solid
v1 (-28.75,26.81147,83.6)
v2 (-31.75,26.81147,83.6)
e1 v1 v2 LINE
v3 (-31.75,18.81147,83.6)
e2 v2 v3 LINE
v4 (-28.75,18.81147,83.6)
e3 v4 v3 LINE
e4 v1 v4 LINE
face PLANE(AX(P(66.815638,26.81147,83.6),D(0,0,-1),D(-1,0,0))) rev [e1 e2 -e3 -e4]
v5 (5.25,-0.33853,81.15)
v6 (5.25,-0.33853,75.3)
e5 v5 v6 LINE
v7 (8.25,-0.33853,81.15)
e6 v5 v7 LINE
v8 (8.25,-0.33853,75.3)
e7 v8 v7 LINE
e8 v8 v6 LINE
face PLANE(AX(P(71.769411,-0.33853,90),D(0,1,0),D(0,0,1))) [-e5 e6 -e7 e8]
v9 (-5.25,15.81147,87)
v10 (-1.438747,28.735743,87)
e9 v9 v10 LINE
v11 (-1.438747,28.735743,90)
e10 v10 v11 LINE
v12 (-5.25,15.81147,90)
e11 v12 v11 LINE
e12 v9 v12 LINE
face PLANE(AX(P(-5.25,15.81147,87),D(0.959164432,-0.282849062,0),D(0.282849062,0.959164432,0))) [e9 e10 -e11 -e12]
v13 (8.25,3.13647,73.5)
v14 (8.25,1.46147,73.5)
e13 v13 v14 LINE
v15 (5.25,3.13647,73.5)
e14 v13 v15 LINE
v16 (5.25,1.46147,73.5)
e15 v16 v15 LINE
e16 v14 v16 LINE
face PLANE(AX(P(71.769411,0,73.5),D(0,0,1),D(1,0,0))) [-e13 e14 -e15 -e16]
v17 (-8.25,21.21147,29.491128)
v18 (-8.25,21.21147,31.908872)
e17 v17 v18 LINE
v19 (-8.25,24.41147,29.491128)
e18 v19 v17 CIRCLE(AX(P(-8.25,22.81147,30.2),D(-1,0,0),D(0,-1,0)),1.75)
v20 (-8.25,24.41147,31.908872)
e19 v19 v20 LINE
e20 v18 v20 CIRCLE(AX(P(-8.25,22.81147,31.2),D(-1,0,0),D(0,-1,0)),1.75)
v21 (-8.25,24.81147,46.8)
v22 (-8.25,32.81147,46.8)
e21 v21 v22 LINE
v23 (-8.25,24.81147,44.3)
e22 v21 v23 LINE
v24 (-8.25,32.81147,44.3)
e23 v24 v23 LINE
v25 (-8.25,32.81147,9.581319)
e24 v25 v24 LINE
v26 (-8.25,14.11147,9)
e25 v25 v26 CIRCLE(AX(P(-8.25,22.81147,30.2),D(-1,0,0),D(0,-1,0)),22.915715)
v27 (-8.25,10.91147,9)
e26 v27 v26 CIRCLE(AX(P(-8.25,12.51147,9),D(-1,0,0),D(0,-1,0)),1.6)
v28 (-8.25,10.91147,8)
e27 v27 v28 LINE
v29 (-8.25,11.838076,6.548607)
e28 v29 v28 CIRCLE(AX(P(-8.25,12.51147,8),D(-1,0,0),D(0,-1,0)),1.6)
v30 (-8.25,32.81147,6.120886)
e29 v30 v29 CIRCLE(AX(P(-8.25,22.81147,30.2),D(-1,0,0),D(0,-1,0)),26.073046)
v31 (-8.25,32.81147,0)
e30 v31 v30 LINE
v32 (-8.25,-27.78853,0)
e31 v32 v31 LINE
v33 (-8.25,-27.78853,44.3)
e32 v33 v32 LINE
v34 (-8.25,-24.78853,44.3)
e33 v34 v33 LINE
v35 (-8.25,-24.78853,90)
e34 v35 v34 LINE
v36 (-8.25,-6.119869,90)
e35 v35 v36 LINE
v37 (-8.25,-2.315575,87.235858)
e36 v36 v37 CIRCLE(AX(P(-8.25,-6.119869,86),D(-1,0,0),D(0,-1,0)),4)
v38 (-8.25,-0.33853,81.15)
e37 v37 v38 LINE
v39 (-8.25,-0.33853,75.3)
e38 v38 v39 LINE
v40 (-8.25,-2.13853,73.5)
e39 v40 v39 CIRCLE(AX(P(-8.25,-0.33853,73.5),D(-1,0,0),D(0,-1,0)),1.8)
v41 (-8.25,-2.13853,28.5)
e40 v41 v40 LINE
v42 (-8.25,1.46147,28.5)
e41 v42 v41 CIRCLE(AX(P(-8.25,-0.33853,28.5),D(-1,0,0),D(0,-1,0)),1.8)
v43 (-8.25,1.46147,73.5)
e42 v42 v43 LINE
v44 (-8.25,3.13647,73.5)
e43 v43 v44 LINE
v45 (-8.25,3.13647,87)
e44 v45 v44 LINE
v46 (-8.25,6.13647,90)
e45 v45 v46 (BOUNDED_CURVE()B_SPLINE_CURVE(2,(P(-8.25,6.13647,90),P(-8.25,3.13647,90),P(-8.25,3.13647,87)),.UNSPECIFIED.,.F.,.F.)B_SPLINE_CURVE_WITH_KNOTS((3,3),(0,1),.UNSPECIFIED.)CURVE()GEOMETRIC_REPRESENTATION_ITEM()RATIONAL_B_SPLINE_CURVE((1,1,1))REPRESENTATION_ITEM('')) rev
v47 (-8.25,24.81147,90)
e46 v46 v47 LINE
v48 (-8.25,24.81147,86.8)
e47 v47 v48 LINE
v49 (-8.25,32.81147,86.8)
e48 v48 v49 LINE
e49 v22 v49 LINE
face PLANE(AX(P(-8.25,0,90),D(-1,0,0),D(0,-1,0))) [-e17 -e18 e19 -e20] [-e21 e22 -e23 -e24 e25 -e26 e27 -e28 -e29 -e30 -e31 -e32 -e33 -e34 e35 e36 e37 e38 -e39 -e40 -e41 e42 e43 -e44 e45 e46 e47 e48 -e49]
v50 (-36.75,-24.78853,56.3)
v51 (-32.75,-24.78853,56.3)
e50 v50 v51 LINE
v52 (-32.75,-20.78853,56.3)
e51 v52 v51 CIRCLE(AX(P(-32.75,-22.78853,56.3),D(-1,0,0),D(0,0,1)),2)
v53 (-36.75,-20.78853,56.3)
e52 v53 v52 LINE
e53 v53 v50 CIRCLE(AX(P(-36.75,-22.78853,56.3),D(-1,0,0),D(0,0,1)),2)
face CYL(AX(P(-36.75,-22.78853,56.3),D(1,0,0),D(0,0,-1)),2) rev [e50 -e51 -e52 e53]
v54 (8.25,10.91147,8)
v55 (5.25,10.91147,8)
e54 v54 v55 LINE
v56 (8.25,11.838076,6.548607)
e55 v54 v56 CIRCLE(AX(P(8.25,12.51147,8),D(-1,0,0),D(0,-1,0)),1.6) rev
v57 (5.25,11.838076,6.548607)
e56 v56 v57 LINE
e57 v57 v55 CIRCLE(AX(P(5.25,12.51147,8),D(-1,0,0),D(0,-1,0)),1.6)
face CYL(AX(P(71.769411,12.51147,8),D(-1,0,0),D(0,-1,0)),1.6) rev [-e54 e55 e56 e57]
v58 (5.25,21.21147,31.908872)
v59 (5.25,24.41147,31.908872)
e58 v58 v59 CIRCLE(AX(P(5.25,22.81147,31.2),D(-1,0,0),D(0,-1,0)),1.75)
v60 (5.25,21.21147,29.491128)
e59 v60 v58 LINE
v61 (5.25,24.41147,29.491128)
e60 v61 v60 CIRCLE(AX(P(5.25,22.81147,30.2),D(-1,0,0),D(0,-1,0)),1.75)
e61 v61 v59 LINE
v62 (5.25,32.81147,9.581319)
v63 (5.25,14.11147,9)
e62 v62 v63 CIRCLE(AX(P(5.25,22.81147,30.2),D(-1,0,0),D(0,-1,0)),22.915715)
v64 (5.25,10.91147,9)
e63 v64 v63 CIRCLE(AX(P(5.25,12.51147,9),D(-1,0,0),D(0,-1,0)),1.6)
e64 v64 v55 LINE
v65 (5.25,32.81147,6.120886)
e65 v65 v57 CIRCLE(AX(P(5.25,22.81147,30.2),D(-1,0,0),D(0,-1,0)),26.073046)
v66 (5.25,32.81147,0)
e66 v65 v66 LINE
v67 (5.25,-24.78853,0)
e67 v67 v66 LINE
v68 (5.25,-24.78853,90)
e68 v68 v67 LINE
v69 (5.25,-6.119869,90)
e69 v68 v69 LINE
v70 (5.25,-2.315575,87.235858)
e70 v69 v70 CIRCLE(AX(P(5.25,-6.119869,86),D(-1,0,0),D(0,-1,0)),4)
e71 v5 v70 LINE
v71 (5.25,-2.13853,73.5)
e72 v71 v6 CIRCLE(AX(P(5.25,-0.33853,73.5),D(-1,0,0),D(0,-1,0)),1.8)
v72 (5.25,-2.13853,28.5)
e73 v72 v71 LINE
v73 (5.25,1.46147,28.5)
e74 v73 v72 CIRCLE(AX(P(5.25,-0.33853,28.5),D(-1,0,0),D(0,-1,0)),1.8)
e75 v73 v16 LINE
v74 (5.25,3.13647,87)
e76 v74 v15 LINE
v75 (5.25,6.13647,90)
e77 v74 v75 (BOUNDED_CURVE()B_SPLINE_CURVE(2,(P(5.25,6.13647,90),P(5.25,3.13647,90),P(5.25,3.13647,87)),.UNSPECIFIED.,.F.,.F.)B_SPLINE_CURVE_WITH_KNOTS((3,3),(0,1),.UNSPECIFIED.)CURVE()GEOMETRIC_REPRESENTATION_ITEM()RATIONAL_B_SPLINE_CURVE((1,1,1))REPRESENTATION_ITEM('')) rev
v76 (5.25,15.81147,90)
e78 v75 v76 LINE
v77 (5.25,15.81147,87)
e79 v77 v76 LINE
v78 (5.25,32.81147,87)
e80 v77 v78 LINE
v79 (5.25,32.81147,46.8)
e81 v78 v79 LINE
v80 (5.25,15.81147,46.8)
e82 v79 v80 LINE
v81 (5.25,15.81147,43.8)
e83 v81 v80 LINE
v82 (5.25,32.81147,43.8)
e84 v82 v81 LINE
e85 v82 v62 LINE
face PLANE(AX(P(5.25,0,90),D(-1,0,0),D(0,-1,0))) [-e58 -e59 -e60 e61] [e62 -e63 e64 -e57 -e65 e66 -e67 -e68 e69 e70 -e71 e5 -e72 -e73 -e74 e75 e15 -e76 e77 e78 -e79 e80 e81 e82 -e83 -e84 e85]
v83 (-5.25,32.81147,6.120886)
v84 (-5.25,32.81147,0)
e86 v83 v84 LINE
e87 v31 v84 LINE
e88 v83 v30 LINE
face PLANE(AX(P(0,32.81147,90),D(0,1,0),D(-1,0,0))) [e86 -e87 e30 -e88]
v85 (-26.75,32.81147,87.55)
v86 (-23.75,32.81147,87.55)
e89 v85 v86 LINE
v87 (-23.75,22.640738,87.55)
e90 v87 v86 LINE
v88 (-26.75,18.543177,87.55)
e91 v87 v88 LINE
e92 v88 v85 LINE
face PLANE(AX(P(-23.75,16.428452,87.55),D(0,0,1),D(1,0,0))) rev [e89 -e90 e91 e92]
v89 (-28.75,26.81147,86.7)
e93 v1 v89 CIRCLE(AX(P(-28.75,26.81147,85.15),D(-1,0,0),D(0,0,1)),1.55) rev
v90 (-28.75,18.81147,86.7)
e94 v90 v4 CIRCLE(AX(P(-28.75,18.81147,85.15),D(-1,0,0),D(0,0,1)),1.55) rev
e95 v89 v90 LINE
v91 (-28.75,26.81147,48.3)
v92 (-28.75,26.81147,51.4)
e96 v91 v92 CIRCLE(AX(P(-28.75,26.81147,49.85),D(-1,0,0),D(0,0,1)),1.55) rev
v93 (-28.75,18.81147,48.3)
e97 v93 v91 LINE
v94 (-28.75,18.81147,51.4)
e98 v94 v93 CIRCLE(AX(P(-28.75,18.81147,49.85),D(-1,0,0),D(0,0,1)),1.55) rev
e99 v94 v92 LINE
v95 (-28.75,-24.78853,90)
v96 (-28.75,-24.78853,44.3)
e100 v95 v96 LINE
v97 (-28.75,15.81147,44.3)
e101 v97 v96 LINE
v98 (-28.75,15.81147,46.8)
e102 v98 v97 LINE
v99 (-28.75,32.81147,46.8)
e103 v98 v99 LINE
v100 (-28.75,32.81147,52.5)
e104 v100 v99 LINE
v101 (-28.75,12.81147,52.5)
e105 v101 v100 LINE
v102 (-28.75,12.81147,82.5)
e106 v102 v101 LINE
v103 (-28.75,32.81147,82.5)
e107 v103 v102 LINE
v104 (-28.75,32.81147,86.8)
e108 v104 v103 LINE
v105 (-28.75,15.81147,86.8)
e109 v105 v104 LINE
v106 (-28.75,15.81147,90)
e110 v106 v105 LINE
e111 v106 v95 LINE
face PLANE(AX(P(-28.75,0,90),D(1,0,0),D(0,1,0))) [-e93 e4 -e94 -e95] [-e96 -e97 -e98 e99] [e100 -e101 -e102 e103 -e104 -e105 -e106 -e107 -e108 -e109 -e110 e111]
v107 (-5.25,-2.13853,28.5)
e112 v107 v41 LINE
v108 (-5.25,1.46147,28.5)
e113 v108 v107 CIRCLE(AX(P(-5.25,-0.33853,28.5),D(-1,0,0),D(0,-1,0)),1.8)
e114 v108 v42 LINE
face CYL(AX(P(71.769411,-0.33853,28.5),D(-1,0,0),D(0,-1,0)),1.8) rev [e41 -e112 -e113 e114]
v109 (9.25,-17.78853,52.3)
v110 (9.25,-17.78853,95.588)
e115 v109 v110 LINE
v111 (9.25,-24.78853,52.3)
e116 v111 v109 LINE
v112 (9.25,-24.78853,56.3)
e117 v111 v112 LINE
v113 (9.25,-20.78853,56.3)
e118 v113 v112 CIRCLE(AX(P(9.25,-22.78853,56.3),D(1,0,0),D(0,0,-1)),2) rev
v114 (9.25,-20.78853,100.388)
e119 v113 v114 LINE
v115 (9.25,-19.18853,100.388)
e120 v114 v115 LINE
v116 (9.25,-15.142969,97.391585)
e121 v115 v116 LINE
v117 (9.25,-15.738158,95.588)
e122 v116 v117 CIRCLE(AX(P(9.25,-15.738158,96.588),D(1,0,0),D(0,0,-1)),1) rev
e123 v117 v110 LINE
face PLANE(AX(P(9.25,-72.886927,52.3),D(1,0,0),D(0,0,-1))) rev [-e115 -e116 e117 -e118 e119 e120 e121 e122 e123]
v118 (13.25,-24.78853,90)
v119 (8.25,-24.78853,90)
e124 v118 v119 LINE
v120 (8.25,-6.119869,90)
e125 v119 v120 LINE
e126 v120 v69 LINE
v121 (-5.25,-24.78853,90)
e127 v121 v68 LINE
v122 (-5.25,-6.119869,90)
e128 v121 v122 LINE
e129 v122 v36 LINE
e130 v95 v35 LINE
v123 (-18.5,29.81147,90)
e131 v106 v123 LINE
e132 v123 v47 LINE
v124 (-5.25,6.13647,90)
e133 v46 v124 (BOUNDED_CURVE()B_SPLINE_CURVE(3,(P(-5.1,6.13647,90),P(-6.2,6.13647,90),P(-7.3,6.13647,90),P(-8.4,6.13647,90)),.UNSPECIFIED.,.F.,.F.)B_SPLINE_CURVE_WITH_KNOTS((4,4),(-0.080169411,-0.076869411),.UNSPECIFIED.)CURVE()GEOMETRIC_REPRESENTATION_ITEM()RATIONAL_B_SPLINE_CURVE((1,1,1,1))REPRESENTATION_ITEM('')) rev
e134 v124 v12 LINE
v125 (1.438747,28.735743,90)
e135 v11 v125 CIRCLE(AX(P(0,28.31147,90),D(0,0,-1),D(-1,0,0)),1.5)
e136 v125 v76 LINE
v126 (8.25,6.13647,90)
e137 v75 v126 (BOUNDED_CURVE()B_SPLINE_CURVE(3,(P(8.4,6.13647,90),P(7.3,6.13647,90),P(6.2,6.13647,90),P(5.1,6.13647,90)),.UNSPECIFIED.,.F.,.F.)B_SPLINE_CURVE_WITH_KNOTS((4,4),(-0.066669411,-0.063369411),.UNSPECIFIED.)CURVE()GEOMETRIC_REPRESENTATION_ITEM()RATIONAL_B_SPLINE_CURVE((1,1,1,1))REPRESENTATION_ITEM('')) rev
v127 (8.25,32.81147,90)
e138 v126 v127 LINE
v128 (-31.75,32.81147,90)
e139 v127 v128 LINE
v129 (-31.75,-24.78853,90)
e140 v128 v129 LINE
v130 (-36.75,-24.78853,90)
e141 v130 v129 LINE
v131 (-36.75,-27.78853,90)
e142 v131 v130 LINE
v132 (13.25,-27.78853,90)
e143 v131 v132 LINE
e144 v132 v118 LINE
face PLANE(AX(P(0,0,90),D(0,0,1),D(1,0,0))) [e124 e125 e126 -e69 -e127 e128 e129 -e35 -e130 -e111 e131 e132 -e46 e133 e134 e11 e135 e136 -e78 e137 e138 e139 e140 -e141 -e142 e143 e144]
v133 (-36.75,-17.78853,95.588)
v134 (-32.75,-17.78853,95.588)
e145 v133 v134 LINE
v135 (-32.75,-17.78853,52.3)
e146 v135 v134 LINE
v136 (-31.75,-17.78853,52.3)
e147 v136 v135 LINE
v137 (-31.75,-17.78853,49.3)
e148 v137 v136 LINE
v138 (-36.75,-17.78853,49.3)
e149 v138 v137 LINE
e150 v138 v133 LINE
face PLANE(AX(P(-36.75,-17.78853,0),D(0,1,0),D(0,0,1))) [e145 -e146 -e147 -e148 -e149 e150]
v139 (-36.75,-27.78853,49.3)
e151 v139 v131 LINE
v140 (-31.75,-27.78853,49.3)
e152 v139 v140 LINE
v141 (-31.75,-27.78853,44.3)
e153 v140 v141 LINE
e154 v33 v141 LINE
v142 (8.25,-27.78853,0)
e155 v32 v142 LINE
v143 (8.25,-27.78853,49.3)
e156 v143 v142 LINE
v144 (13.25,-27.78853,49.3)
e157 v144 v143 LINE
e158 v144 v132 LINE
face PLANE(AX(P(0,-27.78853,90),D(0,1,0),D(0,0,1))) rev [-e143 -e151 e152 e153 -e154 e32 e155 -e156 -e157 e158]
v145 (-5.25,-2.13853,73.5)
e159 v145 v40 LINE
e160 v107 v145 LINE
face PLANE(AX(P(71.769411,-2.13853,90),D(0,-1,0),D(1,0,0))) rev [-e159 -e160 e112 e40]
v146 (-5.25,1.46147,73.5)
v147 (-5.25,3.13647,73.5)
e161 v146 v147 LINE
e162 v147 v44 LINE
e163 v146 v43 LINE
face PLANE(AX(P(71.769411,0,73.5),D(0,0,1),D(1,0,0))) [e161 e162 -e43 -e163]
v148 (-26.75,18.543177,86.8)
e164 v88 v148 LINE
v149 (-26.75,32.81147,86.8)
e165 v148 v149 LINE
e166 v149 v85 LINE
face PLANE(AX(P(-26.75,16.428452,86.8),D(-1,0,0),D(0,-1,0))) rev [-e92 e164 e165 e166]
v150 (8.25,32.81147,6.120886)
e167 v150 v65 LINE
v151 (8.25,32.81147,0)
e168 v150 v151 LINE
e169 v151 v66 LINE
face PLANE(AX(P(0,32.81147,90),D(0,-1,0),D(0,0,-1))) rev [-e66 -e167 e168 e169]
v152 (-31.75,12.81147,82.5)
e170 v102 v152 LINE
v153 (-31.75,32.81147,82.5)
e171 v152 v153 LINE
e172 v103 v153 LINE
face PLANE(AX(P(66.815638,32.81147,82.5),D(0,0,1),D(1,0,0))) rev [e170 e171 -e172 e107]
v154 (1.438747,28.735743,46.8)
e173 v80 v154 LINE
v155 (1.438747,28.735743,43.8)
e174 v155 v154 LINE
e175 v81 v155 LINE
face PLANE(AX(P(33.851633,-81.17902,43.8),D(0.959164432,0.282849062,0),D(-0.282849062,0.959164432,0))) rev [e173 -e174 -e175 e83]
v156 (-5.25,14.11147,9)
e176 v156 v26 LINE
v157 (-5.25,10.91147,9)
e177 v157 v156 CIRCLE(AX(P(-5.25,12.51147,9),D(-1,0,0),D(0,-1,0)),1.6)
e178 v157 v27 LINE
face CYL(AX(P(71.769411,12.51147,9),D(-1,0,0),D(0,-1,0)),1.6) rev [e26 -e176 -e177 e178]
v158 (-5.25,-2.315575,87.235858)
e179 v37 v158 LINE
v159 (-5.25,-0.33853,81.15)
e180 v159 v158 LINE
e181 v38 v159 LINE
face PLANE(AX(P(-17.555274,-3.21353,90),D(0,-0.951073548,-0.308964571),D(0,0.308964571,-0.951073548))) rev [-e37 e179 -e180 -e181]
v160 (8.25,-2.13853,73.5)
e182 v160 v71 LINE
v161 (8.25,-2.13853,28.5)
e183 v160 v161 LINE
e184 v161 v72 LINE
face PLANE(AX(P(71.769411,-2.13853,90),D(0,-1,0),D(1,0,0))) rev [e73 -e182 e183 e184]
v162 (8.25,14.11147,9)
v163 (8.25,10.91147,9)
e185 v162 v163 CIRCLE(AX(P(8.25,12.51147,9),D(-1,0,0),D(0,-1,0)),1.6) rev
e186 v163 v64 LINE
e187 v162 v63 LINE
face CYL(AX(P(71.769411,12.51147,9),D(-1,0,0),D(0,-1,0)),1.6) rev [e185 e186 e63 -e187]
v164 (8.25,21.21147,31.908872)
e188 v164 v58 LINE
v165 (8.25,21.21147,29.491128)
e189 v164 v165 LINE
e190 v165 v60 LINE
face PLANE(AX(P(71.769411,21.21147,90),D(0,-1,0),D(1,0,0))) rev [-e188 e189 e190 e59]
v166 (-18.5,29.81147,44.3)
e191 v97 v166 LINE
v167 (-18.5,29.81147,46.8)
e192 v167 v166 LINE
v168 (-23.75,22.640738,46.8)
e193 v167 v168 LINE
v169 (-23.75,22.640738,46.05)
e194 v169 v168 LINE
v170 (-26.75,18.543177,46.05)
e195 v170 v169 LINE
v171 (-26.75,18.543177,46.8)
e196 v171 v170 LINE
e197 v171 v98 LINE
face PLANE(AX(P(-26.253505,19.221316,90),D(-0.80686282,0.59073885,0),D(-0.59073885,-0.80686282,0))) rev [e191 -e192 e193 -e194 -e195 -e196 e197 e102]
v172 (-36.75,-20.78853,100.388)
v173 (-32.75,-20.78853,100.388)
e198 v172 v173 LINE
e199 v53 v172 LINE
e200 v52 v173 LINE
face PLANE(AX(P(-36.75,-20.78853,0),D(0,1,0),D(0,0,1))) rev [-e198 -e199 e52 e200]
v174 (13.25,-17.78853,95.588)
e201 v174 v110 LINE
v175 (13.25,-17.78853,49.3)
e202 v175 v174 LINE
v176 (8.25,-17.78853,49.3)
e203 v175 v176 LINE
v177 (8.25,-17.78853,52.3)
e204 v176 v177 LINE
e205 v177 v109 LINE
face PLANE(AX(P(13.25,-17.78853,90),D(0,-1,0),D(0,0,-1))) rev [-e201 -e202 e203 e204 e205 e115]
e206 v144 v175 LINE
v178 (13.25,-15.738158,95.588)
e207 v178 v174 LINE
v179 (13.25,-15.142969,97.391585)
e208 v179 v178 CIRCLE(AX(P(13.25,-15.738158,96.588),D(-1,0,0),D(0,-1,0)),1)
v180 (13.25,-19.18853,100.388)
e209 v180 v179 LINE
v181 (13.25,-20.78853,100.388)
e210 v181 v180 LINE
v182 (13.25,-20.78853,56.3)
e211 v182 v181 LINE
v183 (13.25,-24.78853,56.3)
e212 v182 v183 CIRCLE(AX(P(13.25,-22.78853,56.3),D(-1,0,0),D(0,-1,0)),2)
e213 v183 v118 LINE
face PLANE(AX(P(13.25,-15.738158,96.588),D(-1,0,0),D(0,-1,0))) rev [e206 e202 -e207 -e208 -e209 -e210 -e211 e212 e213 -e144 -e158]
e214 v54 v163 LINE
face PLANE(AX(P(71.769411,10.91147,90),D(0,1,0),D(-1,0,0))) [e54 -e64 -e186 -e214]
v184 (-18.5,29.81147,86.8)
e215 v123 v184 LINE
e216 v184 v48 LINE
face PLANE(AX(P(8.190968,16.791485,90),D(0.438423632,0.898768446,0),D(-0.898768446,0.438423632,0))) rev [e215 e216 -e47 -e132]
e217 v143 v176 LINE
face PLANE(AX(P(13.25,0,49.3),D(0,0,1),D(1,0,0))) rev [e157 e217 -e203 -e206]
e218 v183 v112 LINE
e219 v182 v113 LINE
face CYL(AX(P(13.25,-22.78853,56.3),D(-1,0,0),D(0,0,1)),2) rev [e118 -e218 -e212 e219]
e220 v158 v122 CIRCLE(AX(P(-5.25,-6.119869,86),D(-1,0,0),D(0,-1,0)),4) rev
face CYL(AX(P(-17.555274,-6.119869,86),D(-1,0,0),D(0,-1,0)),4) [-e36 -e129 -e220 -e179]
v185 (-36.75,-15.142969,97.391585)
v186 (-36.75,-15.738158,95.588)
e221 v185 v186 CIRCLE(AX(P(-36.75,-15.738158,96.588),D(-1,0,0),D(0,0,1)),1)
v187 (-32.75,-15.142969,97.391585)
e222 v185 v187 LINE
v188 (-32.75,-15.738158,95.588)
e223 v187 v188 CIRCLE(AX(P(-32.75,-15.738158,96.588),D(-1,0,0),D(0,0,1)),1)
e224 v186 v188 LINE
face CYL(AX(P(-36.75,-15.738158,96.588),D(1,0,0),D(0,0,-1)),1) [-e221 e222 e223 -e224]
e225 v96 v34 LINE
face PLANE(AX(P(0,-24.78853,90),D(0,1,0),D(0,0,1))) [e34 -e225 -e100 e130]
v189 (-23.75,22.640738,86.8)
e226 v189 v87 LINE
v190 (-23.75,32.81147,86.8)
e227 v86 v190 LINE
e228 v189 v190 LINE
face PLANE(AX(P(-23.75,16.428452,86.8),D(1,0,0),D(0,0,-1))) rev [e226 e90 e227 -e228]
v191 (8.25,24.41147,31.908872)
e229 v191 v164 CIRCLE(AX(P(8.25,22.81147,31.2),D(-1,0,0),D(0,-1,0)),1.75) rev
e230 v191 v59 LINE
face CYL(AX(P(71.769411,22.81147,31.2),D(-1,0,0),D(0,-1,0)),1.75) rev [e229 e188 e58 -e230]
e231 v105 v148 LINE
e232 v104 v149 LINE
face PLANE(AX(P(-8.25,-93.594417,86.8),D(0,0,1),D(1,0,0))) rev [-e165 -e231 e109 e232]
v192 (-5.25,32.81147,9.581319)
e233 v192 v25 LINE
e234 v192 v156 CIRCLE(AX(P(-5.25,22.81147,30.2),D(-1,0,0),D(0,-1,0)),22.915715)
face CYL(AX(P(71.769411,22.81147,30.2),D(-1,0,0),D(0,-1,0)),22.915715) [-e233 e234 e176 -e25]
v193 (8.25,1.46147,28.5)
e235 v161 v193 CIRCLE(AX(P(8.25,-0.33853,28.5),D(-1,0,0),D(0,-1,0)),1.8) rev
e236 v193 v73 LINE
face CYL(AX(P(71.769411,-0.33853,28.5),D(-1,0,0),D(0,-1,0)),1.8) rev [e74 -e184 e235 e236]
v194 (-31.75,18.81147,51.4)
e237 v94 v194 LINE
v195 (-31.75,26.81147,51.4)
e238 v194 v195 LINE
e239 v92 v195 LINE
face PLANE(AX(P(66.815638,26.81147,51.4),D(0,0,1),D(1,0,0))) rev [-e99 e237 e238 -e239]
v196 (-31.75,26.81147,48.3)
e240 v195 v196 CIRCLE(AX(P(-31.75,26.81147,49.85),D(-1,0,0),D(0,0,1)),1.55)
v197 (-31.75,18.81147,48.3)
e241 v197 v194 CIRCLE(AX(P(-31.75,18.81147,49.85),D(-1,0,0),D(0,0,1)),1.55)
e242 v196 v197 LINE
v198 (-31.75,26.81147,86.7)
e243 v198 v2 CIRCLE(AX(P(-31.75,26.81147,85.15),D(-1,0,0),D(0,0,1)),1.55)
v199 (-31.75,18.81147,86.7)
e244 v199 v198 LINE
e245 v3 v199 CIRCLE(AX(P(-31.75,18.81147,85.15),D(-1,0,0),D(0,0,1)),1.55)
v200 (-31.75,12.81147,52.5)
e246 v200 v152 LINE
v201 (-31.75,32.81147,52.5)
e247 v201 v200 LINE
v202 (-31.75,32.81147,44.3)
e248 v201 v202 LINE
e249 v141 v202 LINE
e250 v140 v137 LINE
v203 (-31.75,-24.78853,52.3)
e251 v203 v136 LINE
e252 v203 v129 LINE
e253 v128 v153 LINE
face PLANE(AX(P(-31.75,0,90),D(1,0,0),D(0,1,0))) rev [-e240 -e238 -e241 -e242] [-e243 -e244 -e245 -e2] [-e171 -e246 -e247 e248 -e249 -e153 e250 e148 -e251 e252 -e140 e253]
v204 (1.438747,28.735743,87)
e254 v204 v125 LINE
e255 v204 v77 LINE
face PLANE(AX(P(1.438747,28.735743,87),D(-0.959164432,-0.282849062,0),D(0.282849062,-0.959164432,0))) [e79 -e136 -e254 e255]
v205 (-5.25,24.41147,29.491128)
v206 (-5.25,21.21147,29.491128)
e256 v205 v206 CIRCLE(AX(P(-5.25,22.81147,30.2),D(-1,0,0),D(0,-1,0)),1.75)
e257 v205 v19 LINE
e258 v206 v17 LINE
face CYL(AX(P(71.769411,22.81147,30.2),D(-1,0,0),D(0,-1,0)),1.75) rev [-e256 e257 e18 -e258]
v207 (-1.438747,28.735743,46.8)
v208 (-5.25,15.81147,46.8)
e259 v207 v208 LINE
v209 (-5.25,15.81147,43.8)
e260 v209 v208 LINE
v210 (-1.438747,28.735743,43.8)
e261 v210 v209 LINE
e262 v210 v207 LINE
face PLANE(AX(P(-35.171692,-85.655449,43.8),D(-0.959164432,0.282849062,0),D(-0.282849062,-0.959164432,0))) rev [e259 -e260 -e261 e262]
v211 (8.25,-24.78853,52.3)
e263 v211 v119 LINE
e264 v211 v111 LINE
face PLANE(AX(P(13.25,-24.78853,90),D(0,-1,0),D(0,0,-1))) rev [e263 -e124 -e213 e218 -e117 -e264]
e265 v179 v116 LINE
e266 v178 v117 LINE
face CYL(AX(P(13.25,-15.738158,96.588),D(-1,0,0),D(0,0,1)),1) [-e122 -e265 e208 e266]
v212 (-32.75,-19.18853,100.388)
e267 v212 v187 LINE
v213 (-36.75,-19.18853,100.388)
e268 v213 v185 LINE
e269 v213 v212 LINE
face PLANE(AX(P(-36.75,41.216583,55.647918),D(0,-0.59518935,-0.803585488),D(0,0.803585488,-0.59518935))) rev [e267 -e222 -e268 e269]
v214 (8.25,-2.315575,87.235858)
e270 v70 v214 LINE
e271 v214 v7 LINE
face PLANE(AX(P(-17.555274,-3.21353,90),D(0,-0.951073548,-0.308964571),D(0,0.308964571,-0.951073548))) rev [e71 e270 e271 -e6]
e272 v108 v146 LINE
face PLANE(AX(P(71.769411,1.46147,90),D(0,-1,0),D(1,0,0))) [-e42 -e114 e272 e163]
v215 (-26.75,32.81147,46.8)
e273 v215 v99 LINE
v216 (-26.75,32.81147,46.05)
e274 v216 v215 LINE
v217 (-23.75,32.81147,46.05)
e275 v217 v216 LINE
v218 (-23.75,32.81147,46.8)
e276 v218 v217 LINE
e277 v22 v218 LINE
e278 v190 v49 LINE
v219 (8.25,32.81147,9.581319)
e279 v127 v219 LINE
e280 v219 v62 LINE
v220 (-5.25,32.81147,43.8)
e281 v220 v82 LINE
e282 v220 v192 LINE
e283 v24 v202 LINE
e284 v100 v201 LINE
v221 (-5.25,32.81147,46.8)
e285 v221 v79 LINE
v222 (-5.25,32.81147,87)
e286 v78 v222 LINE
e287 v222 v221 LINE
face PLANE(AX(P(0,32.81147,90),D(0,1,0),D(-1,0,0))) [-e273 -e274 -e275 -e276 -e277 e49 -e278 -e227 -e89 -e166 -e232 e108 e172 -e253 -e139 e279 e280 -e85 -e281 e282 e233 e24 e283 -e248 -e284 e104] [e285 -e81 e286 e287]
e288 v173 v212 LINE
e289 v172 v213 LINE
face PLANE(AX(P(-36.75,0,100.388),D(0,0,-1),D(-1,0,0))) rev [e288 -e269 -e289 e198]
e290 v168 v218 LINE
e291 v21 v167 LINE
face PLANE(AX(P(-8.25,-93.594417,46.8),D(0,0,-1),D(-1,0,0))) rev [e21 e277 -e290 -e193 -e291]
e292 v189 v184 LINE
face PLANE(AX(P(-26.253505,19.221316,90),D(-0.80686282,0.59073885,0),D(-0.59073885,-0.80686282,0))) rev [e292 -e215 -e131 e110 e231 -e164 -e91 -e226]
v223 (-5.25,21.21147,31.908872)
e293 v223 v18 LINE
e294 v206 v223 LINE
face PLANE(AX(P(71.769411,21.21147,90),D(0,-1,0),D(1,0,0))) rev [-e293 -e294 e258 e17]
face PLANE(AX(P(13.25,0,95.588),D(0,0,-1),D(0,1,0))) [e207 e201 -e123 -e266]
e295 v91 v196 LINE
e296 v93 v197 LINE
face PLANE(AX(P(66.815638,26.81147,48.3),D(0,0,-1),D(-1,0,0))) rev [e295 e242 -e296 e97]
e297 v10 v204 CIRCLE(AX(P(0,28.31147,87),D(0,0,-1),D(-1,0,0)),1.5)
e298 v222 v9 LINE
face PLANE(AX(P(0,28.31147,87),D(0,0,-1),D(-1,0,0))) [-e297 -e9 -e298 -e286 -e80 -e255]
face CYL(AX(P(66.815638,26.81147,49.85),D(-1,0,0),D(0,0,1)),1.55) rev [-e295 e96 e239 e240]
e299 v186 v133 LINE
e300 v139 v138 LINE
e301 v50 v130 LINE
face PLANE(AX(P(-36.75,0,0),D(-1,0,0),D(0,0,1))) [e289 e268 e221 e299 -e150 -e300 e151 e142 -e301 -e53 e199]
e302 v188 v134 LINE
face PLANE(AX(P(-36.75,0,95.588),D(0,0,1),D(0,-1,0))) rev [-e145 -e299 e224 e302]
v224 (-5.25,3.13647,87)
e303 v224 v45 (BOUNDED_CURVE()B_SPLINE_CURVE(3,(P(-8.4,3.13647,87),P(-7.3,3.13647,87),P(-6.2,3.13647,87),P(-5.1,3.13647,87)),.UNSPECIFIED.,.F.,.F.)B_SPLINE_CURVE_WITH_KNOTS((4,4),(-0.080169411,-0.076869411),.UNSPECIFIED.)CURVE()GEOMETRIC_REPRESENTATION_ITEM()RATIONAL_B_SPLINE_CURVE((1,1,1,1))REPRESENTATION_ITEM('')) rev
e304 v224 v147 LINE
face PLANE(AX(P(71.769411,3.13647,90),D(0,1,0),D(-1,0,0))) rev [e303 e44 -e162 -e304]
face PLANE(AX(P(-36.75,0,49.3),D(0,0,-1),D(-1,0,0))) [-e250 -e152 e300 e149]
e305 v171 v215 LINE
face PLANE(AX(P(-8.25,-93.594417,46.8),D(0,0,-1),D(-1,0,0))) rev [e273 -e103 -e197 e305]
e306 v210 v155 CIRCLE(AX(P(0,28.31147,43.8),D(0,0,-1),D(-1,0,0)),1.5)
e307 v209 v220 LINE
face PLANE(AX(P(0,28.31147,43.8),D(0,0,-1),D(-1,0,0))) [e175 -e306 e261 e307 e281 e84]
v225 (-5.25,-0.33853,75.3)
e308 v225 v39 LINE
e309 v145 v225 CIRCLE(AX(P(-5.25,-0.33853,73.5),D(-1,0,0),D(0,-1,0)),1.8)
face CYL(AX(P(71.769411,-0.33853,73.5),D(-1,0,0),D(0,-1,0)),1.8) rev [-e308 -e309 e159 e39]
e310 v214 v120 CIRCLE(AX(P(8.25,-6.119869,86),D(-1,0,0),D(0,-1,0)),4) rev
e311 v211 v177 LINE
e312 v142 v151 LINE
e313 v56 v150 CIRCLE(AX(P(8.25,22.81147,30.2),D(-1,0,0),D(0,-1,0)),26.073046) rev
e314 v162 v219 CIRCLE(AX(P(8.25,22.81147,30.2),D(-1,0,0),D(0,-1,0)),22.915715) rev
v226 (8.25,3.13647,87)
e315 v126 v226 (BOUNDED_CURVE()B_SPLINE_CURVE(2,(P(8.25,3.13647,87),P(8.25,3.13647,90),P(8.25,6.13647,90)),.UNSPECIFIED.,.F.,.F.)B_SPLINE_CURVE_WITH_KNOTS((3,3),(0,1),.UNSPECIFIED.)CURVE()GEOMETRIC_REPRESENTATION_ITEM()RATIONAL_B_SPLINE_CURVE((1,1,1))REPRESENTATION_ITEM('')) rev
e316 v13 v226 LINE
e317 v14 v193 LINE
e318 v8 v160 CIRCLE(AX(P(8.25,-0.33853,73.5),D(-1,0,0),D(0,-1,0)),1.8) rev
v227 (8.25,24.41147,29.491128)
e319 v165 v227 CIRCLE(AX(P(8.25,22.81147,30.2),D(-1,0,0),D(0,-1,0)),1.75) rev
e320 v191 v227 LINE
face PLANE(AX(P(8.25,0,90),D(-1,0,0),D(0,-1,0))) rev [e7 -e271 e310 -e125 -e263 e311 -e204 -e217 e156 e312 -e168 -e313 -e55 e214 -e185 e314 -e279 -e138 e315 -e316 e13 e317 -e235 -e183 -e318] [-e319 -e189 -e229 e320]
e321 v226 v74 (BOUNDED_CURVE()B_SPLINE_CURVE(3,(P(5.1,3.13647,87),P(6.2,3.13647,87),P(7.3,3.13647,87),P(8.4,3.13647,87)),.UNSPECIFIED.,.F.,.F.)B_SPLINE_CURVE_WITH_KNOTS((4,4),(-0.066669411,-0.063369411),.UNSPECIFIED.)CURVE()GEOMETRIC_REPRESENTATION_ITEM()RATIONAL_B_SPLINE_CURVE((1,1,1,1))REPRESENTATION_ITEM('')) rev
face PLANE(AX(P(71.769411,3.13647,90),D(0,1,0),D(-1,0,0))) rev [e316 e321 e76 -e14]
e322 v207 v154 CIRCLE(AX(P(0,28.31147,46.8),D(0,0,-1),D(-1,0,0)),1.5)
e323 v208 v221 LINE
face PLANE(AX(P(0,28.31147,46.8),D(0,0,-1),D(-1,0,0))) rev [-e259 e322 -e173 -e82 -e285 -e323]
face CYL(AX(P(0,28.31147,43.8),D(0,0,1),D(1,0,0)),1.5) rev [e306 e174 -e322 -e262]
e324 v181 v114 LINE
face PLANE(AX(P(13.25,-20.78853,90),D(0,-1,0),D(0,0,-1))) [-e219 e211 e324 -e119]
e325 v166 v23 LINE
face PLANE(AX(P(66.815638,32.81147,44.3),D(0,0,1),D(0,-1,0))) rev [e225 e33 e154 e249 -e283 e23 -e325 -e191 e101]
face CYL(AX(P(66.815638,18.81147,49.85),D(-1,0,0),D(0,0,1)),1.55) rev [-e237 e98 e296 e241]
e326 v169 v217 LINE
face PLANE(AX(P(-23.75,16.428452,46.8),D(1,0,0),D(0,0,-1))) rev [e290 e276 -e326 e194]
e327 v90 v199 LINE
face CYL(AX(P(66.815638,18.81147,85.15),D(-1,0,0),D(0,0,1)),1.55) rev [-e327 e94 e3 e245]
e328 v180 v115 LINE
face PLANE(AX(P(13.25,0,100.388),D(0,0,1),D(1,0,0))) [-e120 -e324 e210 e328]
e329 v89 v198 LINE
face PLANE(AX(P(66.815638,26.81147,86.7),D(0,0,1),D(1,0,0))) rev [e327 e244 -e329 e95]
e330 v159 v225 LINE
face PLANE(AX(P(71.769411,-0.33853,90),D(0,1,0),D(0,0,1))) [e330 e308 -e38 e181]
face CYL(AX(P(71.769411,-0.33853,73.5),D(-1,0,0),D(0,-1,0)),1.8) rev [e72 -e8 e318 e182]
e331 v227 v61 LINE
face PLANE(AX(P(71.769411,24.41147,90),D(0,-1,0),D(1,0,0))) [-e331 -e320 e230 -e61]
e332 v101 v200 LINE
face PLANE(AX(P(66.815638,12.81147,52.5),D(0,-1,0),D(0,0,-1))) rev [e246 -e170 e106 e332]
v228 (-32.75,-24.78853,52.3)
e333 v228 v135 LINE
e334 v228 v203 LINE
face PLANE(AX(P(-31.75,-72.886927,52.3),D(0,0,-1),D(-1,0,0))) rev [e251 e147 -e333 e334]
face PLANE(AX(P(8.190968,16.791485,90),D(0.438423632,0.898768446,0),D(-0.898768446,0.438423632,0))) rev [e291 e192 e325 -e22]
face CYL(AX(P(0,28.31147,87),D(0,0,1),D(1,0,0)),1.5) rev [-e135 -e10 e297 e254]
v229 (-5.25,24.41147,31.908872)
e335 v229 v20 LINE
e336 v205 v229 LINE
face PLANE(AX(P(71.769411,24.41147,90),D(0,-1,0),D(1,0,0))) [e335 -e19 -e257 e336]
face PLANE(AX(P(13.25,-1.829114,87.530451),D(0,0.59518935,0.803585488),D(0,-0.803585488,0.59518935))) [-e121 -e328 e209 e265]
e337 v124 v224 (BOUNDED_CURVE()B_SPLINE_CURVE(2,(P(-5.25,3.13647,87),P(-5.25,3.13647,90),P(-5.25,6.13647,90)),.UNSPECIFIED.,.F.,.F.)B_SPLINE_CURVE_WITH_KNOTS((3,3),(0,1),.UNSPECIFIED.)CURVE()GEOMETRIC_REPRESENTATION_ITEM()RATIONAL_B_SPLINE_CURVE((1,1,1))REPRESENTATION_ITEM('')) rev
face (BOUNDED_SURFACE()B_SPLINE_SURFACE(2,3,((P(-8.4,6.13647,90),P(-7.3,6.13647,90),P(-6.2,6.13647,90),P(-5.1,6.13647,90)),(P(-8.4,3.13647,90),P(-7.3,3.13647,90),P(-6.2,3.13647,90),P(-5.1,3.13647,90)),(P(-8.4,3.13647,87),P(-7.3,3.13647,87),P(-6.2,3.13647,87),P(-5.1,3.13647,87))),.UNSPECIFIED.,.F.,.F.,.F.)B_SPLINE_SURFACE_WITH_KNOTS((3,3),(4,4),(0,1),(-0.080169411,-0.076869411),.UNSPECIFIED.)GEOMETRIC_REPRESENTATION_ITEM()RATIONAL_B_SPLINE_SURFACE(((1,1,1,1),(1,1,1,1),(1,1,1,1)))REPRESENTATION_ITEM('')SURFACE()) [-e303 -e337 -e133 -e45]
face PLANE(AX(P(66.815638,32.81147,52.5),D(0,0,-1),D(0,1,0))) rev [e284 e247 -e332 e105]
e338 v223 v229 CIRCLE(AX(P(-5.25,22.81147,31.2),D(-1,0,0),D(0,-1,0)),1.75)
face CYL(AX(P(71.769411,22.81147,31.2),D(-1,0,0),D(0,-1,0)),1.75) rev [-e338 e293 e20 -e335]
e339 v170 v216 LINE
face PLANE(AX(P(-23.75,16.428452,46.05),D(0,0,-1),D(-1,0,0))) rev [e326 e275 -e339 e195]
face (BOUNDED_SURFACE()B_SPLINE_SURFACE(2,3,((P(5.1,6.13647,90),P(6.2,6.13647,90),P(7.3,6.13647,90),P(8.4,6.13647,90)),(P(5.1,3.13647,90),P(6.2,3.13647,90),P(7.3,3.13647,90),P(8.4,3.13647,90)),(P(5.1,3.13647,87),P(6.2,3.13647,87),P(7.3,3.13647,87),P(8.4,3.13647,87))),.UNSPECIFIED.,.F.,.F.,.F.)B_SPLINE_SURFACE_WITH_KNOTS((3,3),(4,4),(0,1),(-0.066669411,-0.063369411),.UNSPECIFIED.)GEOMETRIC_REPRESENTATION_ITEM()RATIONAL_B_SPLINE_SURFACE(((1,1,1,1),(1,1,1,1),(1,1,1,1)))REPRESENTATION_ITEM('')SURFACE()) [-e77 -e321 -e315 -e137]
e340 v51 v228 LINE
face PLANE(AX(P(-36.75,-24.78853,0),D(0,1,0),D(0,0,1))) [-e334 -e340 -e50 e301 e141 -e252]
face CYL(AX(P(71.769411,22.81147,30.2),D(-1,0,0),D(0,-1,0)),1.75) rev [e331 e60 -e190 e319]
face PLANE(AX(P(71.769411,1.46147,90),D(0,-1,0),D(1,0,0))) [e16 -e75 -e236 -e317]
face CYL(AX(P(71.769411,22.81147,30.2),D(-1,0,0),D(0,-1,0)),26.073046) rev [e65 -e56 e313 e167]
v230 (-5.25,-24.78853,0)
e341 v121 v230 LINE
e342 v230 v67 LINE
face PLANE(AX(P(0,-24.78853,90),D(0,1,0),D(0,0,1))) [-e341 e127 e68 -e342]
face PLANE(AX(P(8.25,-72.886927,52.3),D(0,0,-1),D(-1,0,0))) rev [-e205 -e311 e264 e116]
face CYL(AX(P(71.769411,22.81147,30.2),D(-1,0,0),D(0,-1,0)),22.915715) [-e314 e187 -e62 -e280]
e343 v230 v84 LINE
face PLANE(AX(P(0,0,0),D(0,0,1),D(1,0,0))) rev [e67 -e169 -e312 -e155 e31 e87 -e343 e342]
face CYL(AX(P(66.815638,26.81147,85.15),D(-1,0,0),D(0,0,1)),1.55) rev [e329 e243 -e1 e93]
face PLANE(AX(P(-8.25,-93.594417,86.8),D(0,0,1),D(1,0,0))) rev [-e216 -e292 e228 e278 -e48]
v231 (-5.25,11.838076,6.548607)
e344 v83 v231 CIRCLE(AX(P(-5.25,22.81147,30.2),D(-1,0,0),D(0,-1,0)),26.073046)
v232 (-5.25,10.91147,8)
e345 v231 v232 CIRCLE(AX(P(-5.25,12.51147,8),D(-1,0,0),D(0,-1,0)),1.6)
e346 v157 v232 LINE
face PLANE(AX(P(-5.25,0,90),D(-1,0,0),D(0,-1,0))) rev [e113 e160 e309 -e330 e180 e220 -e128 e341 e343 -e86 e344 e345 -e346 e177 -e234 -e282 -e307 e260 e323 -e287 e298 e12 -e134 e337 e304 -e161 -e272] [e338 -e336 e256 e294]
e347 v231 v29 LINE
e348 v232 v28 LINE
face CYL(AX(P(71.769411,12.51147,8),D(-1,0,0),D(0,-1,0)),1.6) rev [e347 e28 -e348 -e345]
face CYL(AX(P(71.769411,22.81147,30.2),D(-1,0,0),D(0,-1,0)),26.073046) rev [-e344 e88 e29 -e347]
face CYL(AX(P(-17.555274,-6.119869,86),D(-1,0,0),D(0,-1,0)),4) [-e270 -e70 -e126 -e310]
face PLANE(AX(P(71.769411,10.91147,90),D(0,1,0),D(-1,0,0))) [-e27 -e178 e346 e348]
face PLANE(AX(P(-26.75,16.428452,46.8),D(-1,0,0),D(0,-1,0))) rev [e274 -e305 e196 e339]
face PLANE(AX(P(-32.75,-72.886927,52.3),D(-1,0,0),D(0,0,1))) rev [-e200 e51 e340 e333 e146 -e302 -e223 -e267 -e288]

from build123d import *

# Parameters (mm, degrees)
SKETCH1_W                    = 20.5
SKETCH1_H                    = 3
SKETCH1_W_2                  = 3
SKETCH1_W_3                  = 10.5
SKETCH1_H_2                  = 2
MAIN_EXTRUDE_DEPTH           = 90
SWITCH_LEVER_START           = -16.5
SWITCH_LEVER_HOLES_DEPTH     = 16.5
SERVO_START                  = -23.5
SKETCH3_W                    = 30
SKETCH3_H                    = 20
SKETCH3_W_2                  = 44.3
SKETCH3_H_2                  = 60.6
SERVO_MOUNT_SLOTS_DEPTH      = 23.5
SERVO_HOLE_EXPANSION_REACH   = 70.75
SKETCH4_W                    = 20.5
SKETCH4_H                    = 8
SERVO_HOLE_EXPANSION_2_REACH = 115.051
SKETCH5_W                    = 20.5
SKETCH5_H                    = 40
SKETCH5_W_2                  = 10.5
SKETCH5_H_2                  = 12
SKETCH5_H_3                  = 68
TAB1_DEPTH                   = 5
TAB2_START                   = -45
TAB2_DEPTH                   = 5
TAB_SPACER_REACH             = 124.885
SKETCH7_W                    = 1
SKETCH7_H                    = 48.088
LEVER_SHELF_DEPTH            = 10.5
SKETCH10_W                   = 10.5
SKETCH10_H                   = 3.45
CUT_EXTRUDE2_DEPTH           = 45
BOSS_EXTRUDE1_DEPTH          = 3
BOSS_EXTRUDE2_START          = -43.2
BOSS_EXTRUDE2_DEPTH          = 3
FILLET1_SIZE                 = 3
CUT_EXTRUDE3_REACH           = 124.885
SKETCH12_W                   = 3
SKETCH12_H                   = 0.75
CUT_EXTRUDE4_REACH           = 116.801
FILLET2_R                    = 4


with BuildPart() as part:
    # Sketch1 → Main Extrude (new body)
    with BuildSketch(Plane.XY):
        Polygon((-8.25, 32.811469611), (-28.75, 32.811469611), (-28.75, 15.811469611), (-18.5, 29.811469611), (-8.25, 24.811469611), align=None)
        Polygon((-28.75, 15.811469611), (-28.75, 32.811469611), (-31.75, 32.811469611), (-31.75, -24.788530389), (-28.75, -24.788530389), align=None)
        with Locations((-18.5, -26.288530389)):
            Rectangle(SKETCH1_W, SKETCH1_H)
        with Locations((-30.25, -26.288530389)):
            Rectangle(SKETCH1_W_2, SKETCH1_H)
        with Locations((-6.75, -26.288530389)):
            Rectangle(SKETCH1_W_2, SKETCH1_H)
        Polygon((-5.25, 32.811469611), (-8.25, 32.811469611), (-8.25, 24.811469611), (-8.25, -24.788530389), (-5.25, -24.788530389), (-5.25, 3.911469611), (-5.25, 5.911469611), align=None)
        with Locations((0, -26.288530389)):
            Rectangle(SKETCH1_W_3, SKETCH1_H)
        with Locations((6.75, -26.288530389)):
            Rectangle(SKETCH1_W_2, SKETCH1_H)
        Polygon((5.25, 32.811469611), (5.25, 5.911469611), (5.25, 3.911469611), (5.25, -24.788530389), (8.25, -24.788530389), (8.25, 32.811469611), align=None)
        with Locations((0, 4.911469611)):
            Rectangle(SKETCH1_W_3, SKETCH1_H_2)
    extrude(amount=MAIN_EXTRUDE_DEPTH)

    # Sketch2 → Switch/Lever Holes (cut)
    with BuildSketch(Plane(origin=(8.25, 0, 0), x_dir=(0, 0, -1), z_dir=(1, 0, 0)).offset(SWITCH_LEVER_START)):
        with BuildLine():
            Line((-90, -0.338530389), (-75.3, -0.338530389))
            ThreePointArc((-75.3, -0.338530389), (-74.772792206, -1.611322596), (-73.5, -2.138530389))
            Line((-73.5, -2.138530389), (-28.5, -2.138530389))
            ThreePointArc((-28.5, -2.138530389), (-26.7, -0.338530389), (-28.5, 1.461469611))
            Line((-28.5, 1.461469611), (-73.5, 1.461469611))
            Line((-73.5, 1.461469611), (-73.5, 3.136469611))
            Line((-73.5, 3.136469611), (-90, 3.136469611))
            Line((-90, 3.136469611), (-90, -0.338530389))
        make_face()
        with BuildLine():
            Line((-29.491127656, 24.411469611), (-31.908872344, 24.411469611))
            ThreePointArc((-31.908872344, 24.411469611), (-32.95, 22.811469611), (-31.908872344, 21.211469611))
            Line((-31.908872344, 21.211469611), (-29.491127656, 21.211469611))
            ThreePointArc((-29.491127656, 21.211469611), (-28.45, 22.811469611), (-29.491127656, 24.411469611))
        make_face()
        with BuildLine():
            Line((-9, 10.911469611), (-8, 10.911469611))
            ThreePointArc((-8, 10.911469611), (-7.139020973, 11.162872148), (-6.548607336, 11.838075717))
            ThreePointArc((-6.548607336, 11.838075717), (-4.132373754, 22.279858493), (-6.120885638, 32.811469611))
            Line((-6.120885638, 32.811469611), (-9.58131915, 32.811469611))
            ThreePointArc((-9.58131915, 32.811469611), (-7.295349446, 23.52349699), (-9, 14.111469611))
            ThreePointArc((-9, 14.111469611), (-10.6, 12.511469611), (-9, 10.911469611))
        make_face()
    extrude(amount=SWITCH_LEVER_HOLES_DEPTH, mode=Mode.SUBTRACT)

    # Sketch3 → Servo Mount Slots (cut)
    with BuildSketch(Plane.ZY.offset(31.75).offset(SERVO_START)):
        with Locations((67.5, 22.811469611)):
            Rectangle(SKETCH3_W, SKETCH3_H)
        with BuildLine():
            Line((51.4, 26.811469611), (51.4, 18.811469611))
            ThreePointArc((51.4, 18.811469611), (49.85, 17.261469611), (48.3, 18.811469611))
            Line((48.3, 18.811469611), (48.3, 26.811469611))
            ThreePointArc((48.3, 26.811469611), (49.85, 28.361469611), (51.4, 26.811469611))
        make_face()
        with BuildLine():
            Line((86.7, 26.811469611), (86.7, 18.811469611))
            ThreePointArc((86.7, 18.811469611), (85.15, 17.261469611), (83.6, 18.811469611))
            Line((83.6, 18.811469611), (83.6, 26.811469611))
            ThreePointArc((83.6, 26.811469611), (85.15, 28.361469611), (86.7, 26.811469611))
        make_face()
        with Locations((22.15, 2.511469611)):
            Rectangle(SKETCH3_W_2, SKETCH3_H_2)
    extrude(amount=SERVO_MOUNT_SLOTS_DEPTH, mode=Mode.SUBTRACT)

    # Servo Hole Expansion: up to this face of the body (flat: up to its plane)
    servo_hole_expansion_end = Plane(part.part.faces().sort_by_distance((-9.616666667, 26.144802944, 83.6))[0])
    # Sketch4 → Servo Hole Expansion (cut, up to the picked face)
    with BuildSketch(Plane(origin=(0, 0, 51.4), x_dir=(-1, 0, 0), z_dir=(0, 0, -1)), mode=Mode.PRIVATE) as servo_hole_expansion_sk1:
        with Locations((18.5, 28.811469611)):
            Rectangle(SKETCH4_W, SKETCH4_H)
    servo_hole_expansion_tool1 = split(extrude(servo_hole_expansion_sk1.sketch, amount=-SERVO_HOLE_EXPANSION_REACH, mode=Mode.PRIVATE), bisect_by=servo_hole_expansion_end, keep=Keep.BOTH, mode=Mode.PRIVATE)
    add(servo_hole_expansion_tool1.solids().sort_by(Axis((-18.5, 28.81147, 51.4), (0, 0, 1)))[0], mode=Mode.SUBTRACT)

    # Servo Hole Expansion 2: up to this face of the body (flat: up to its plane)
    servo_hole_expansion_2_end = Plane(part.part.faces().sort_by_distance((-18.5, -24.788530389, 67.15))[0])
    # Sketch5 → Servo Hole Expansion 2 (cut, up to the picked face)
    with BuildSketch(Plane(origin=(0, 32.811469611, 0), x_dir=(1, 0, 0), z_dir=(0, 1, 0)), mode=Mode.PRIVATE) as servo_hole_expansion_2_sk1:
        with Locations((-18.5, -66.8)):
            Rectangle(SKETCH5_W, SKETCH5_H)
    servo_hole_expansion_2_tool1 = split(extrude(servo_hole_expansion_2_sk1.sketch, amount=-SERVO_HOLE_EXPANSION_2_REACH, mode=Mode.PRIVATE), bisect_by=servo_hole_expansion_2_end, keep=Keep.BOTH, mode=Mode.PRIVATE)
    # Sketch5 → Servo Hole Expansion 2 (cut, up to the picked face)
    with BuildSketch(Plane(origin=(0, 32.811469611, 0), x_dir=(1, 0, 0), z_dir=(0, 1, 0)), mode=Mode.PRIVATE) as servo_hole_expansion_2_sk2:
        with Locations((0, -6)):
            Rectangle(SKETCH5_W_2, SKETCH5_H_2)
    servo_hole_expansion_2_tool2 = split(extrude(servo_hole_expansion_2_sk2.sketch, amount=-SERVO_HOLE_EXPANSION_2_REACH, mode=Mode.PRIVATE), bisect_by=servo_hole_expansion_2_end, keep=Keep.BOTH, mode=Mode.PRIVATE)
    # Sketch5 → Servo Hole Expansion 2 (cut, up to the picked face)
    with BuildSketch(Plane(origin=(0, 32.811469611, 0), x_dir=(1, 0, 0), z_dir=(0, 1, 0)), mode=Mode.PRIVATE) as servo_hole_expansion_2_sk3:
        with Locations((0, -56)):
            Rectangle(SKETCH5_W_2, SKETCH5_H_3)
    servo_hole_expansion_2_tool3 = split(extrude(servo_hole_expansion_2_sk3.sketch, amount=-SERVO_HOLE_EXPANSION_2_REACH, mode=Mode.PRIVATE), bisect_by=servo_hole_expansion_2_end, keep=Keep.BOTH, mode=Mode.PRIVATE)
    add(servo_hole_expansion_2_tool1.solids().sort_by(Axis((-18.5, 32.81147, 66.8), (0, -1, 0)))[0], mode=Mode.SUBTRACT)
    add(servo_hole_expansion_2_tool2.solids().sort_by(Axis((0, 32.81147, 6), (0, -1, 0)))[0], mode=Mode.SUBTRACT)
    add(servo_hole_expansion_2_tool3.solids().sort_by(Axis((0, 32.81147, 56), (0, -1, 0)))[0], mode=Mode.SUBTRACT)

    # Sketch6 → Tab1 (add)
    with BuildSketch(Plane.ZY.offset(31.75)):
        with BuildLine():
            Line((49.3, -17.788530389), (49.3, -27.788530389))
            Line((49.3, -27.788530389), (90, -27.788530389))
            Line((90, -27.788530389), (90, -24.788530389))
            Line((90, -24.788530389), (56.3, -24.788530389))
            ThreePointArc((56.3, -24.788530389), (54.3, -22.788530389), (56.3, -20.788530389))
            Line((56.3, -20.788530389), (90, -20.788530389))
            Line((90, -20.788530389), (90, -17.788530389))
            Line((90, -17.788530389), (49.3, -17.788530389))
        make_face()
        Polygon((95.588, -17.788530389), (90, -17.788530389), (90, -20.788530389), (100.388, -20.788530389), (100.388, -19.188530389), (99.35106603, -17.788530389), align=None)
        with BuildLine():
            Line((95.588, -15.738158077), (95.588, -17.788530389))
            Line((95.588, -17.788530389), (99.35106603, -17.788530389))
            Line((99.35106603, -17.788530389), (97.391585488, -15.142968726))
            ThreePointArc((97.391585488, -15.142968726), (96.274619631, -14.788530389), (95.588, -15.738158077))
        make_face()
    extrude(amount=TAB1_DEPTH)

    # Sketch6<4> → Tab2 (add)
    with BuildSketch(Plane.ZY.offset(31.75).offset(TAB2_START)):
        with BuildLine():
            Line((49.3, -17.788530389), (49.3, -27.788530389))
            Line((49.3, -27.788530389), (90, -27.788530389))
            Line((90, -27.788530389), (90, -24.788530389))
            Line((90, -24.788530389), (56.3, -24.788530389))
            ThreePointArc((56.3, -24.788530389), (54.3, -22.788530389), (56.3, -20.788530389))
            Line((56.3, -20.788530389), (90, -20.788530389))
            Line((90, -20.788530389), (90, -17.788530389))
            Line((90, -17.788530389), (49.3, -17.788530389))
        make_face()
        Polygon((95.588, -17.788530389), (90, -17.788530389), (90, -20.788530389), (100.388, -20.788530389), (100.388, -19.188530389), (99.35106603, -17.788530389), align=None)
        with BuildLine():
            Line((95.588, -15.738158077), (95.588, -17.788530389))
            Line((95.588, -17.788530389), (99.35106603, -17.788530389))
            Line((99.35106603, -17.788530389), (97.391585488, -15.142968726))
            ThreePointArc((97.391585488, -15.142968726), (96.274619631, -14.788530389), (95.588, -15.738158077))
        make_face()
    extrude(amount=TAB2_DEPTH)

    # Tab Spacer: up to this face of the body (flat: up to its plane)
    tab_spacer_end = Plane(part.part.faces().sort_by_distance((-18.5, -24.788530389, 67.15))[0])
    # Sketch7 → Tab Spacer (cut, up to the picked face)
    with BuildSketch(Plane(origin=(0, 32.811469611, 0), x_dir=(1, 0, 0), z_dir=(0, 1, 0)), mode=Mode.PRIVATE) as tab_spacer_sk1:
        with Locations((-32.25, -76.344)):
            Rectangle(SKETCH7_W, SKETCH7_H)
    tab_spacer_tool1 = split(extrude(tab_spacer_sk1.sketch, amount=-TAB_SPACER_REACH, mode=Mode.PRIVATE), bisect_by=tab_spacer_end, keep=Keep.BOTH, mode=Mode.PRIVATE)
    # Sketch7 → Tab Spacer (cut, up to the picked face)
    with BuildSketch(Plane(origin=(0, 32.811469611, 0), x_dir=(1, 0, 0), z_dir=(0, 1, 0)), mode=Mode.PRIVATE) as tab_spacer_sk2:
        with Locations((8.75, -76.344)):
            Rectangle(SKETCH7_W, SKETCH7_H)
    tab_spacer_tool2 = split(extrude(tab_spacer_sk2.sketch, amount=-TAB_SPACER_REACH, mode=Mode.PRIVATE), bisect_by=tab_spacer_end, keep=Keep.BOTH, mode=Mode.PRIVATE)
    add(tab_spacer_tool1.solids().sort_by(Axis((-32.25, 32.81147, 76.344), (0, -1, 0)))[0], mode=Mode.SUBTRACT)
    add(tab_spacer_tool2.solids().sort_by(Axis((8.75, 32.81147, 76.344), (0, -1, 0)))[0], mode=Mode.SUBTRACT)

    # Sketch8 → Lever Shelf (cut)
    with BuildSketch(Plane(origin=(-5.25, 0, 0), x_dir=(0, 0, -1), z_dir=(1, 0, 0))):
        with BuildLine():
            Line((-22, 5.911469611), (-22, 3.911469611))
            Line((-22, 3.911469611), (-17, 3.911469611))
            ThreePointArc((-17, 3.911469611), (-19.692582404, 4.430013602), (-22, 5.911469611))
        make_face()
    extrude(amount=LEVER_SHELF_DEPTH, mode=Mode.SUBTRACT)

    # Sketch10 → Cut-Extrude2 (cut)
    with BuildSketch(Plane(origin=(0, 0, 0), x_dir=(-1, 0, 0), z_dir=(0, 0, -1))):
        with Locations((0, 4.186469611)):
            Rectangle(SKETCH10_W, SKETCH10_H)
    extrude(amount=-CUT_EXTRUDE2_DEPTH, mode=Mode.SUBTRACT)

    # Sketch11 → Boss-Extrude1 (add)
    with BuildSketch(Plane.XY.offset(90)):
        with BuildLine():
            Line((-5.25, 32.811469611), (5.25, 32.811469611))
            Line((5.25, 32.811469611), (5.25, 15.811469611))
            Line((5.25, 15.811469611), (1.438746649, 28.735743203))
            ThreePointArc((1.438746649, 28.735743203), (0, 29.811469611), (-1.438746649, 28.735743203))
            Line((-1.438746649, 28.735743203), (-5.25, 15.811469611))
            Line((-5.25, 15.811469611), (-5.25, 32.811469611))
        make_face()
    extrude(amount=-BOSS_EXTRUDE1_DEPTH)

    # Sketch11<2> → Boss-Extrude2 (add)
    with BuildSketch(Plane.XY.offset(90).offset(BOSS_EXTRUDE2_START)):
        with BuildLine():
            Line((-5.25, 32.811469611), (5.25, 32.811469611))
            Line((5.25, 32.811469611), (5.25, 15.811469611))
            Line((5.25, 15.811469611), (1.438746649, 28.735743203))
            ThreePointArc((1.438746649, 28.735743203), (0, 29.811469611), (-1.438746649, 28.735743203))
            Line((-1.438746649, 28.735743203), (-5.25, 15.811469611))
            Line((-5.25, 15.811469611), (-5.25, 32.811469611))
        make_face()
    extrude(amount=-BOSS_EXTRUDE2_DEPTH)

    # Fillet1
    # a fillet whose section is not a circle: 3 mm, written as the material it takes off along each edge
    with BuildSketch(Plane(origin=(-2.25, -0.338530389, 90), x_dir=(0, -1, 0), z_dir=(1, 0, 0)), Plane(origin=(-15.75, -0.338530389, 90), x_dir=(0, -1, 0), z_dir=(1, 0, 0))) as fillet1_piece_1:
        with BuildLine():
            Bezier((FILLET1_SIZE, 0), (0, 0), (0, FILLET1_SIZE), weights=[1, 1, 1])
            Line((0, FILLET1_SIZE), (0, 0))
            Line((0, 0), (FILLET1_SIZE, 0))
        make_face()
    extrude(amount=18, mode=Mode.SUBTRACT)
    with BuildSketch(Plane(origin=(-15.75, 3.136469611, 90), x_dir=(0, 1, 0), z_dir=(1, 0, 0)), Plane(origin=(-2.25, 3.136469611, 90), x_dir=(0, 1, 0), z_dir=(1, 0, 0))) as fillet1_piece_2:
        with BuildLine():
            Bezier((FILLET1_SIZE, 0), (0, 0), (0, -FILLET1_SIZE), weights=[1, 1, 1])
            Line((0, -FILLET1_SIZE), (0, 0))
            Line((0, 0), (FILLET1_SIZE, 0))
        make_face()
    extrude(amount=18, mode=Mode.SUBTRACT)

    # Cut-Extrude3: up to this plane
    cut_extrude3_end = Plane(origin=(-26.253505133, 19.221316258, 90), z_dir=(-0.806862820153453, 0.5907388504694919, 0))
    # Sketch12 → Cut-Extrude3 (cut, up to the surface)
    with BuildSketch(Plane(origin=(0, 32.811469611, 0), x_dir=(1, 0, 0), z_dir=(0, 1, 0)), mode=Mode.PRIVATE) as cut_extrude3_sk1:
        with Locations((-25.25, -87.175)):
            Rectangle(SKETCH12_W, SKETCH12_H)
    cut_extrude3_tool1 = split(extrude(cut_extrude3_sk1.sketch, amount=-CUT_EXTRUDE3_REACH, mode=Mode.PRIVATE), bisect_by=cut_extrude3_end, keep=Keep.BOTH, mode=Mode.PRIVATE)
    add(cut_extrude3_tool1.solids().sort_by_distance((-25.25, 32.81147, 87.175))[0], mode=Mode.SUBTRACT)
    # Sketch12 → Cut-Extrude3 (cut, up to the surface)
    with BuildSketch(Plane(origin=(0, 32.811469611, 0), x_dir=(1, 0, 0), z_dir=(0, 1, 0)), mode=Mode.PRIVATE) as cut_extrude3_sk2:
        with Locations((-25.25, -46.425)):
            Rectangle(SKETCH12_W, SKETCH12_H)
    cut_extrude3_tool2 = split(extrude(cut_extrude3_sk2.sketch, amount=-CUT_EXTRUDE3_REACH, mode=Mode.PRIVATE), bisect_by=cut_extrude3_end, keep=Keep.BOTH, mode=Mode.PRIVATE)
    add(cut_extrude3_tool2.solids().sort_by_distance((-25.25, 32.81147, 46.425))[0], mode=Mode.SUBTRACT)

    # Cut-Extrude4: up to this face of the body (flat: up to its plane)
    cut_extrude4_end = Plane(part.part.faces().sort_by_distance((-8.25, 2.844014884, 44.117576332))[0])
    # Sketch13 → Cut-Extrude4 (cut, up to the picked face)
    with BuildSketch(Plane(origin=(8.25, 0, 0), x_dir=(0, 0, -1), z_dir=(1, 0, 0)), mode=Mode.PRIVATE) as cut_extrude4_sk1:
        Polygon((-81.15, -0.338530389), (-90, -0.338530389), (-90, -3.213530389), align=None)
    cut_extrude4_tool1 = split(extrude(cut_extrude4_sk1.sketch, amount=-CUT_EXTRUDE4_REACH, mode=Mode.PRIVATE), bisect_by=cut_extrude4_end, keep=Keep.BOTH, mode=Mode.PRIVATE)
    add(cut_extrude4_tool1.solids().sort_by(Axis((8.25, -1.296864, 87.05), (-1, 0, 0)))[0], mode=Mode.SUBTRACT)

    # Fillet2
    fillet2_edges = [part.edges().sort_by_distance(p)[0] for p in [
        (6.7499997, -3.213095302, 89.998660688),
        (-6.7499997, -3.213095302, 89.998660688),
    ]]
    fillet(fillet2_edges, radius=FILLET2_R)


solid = part.part
